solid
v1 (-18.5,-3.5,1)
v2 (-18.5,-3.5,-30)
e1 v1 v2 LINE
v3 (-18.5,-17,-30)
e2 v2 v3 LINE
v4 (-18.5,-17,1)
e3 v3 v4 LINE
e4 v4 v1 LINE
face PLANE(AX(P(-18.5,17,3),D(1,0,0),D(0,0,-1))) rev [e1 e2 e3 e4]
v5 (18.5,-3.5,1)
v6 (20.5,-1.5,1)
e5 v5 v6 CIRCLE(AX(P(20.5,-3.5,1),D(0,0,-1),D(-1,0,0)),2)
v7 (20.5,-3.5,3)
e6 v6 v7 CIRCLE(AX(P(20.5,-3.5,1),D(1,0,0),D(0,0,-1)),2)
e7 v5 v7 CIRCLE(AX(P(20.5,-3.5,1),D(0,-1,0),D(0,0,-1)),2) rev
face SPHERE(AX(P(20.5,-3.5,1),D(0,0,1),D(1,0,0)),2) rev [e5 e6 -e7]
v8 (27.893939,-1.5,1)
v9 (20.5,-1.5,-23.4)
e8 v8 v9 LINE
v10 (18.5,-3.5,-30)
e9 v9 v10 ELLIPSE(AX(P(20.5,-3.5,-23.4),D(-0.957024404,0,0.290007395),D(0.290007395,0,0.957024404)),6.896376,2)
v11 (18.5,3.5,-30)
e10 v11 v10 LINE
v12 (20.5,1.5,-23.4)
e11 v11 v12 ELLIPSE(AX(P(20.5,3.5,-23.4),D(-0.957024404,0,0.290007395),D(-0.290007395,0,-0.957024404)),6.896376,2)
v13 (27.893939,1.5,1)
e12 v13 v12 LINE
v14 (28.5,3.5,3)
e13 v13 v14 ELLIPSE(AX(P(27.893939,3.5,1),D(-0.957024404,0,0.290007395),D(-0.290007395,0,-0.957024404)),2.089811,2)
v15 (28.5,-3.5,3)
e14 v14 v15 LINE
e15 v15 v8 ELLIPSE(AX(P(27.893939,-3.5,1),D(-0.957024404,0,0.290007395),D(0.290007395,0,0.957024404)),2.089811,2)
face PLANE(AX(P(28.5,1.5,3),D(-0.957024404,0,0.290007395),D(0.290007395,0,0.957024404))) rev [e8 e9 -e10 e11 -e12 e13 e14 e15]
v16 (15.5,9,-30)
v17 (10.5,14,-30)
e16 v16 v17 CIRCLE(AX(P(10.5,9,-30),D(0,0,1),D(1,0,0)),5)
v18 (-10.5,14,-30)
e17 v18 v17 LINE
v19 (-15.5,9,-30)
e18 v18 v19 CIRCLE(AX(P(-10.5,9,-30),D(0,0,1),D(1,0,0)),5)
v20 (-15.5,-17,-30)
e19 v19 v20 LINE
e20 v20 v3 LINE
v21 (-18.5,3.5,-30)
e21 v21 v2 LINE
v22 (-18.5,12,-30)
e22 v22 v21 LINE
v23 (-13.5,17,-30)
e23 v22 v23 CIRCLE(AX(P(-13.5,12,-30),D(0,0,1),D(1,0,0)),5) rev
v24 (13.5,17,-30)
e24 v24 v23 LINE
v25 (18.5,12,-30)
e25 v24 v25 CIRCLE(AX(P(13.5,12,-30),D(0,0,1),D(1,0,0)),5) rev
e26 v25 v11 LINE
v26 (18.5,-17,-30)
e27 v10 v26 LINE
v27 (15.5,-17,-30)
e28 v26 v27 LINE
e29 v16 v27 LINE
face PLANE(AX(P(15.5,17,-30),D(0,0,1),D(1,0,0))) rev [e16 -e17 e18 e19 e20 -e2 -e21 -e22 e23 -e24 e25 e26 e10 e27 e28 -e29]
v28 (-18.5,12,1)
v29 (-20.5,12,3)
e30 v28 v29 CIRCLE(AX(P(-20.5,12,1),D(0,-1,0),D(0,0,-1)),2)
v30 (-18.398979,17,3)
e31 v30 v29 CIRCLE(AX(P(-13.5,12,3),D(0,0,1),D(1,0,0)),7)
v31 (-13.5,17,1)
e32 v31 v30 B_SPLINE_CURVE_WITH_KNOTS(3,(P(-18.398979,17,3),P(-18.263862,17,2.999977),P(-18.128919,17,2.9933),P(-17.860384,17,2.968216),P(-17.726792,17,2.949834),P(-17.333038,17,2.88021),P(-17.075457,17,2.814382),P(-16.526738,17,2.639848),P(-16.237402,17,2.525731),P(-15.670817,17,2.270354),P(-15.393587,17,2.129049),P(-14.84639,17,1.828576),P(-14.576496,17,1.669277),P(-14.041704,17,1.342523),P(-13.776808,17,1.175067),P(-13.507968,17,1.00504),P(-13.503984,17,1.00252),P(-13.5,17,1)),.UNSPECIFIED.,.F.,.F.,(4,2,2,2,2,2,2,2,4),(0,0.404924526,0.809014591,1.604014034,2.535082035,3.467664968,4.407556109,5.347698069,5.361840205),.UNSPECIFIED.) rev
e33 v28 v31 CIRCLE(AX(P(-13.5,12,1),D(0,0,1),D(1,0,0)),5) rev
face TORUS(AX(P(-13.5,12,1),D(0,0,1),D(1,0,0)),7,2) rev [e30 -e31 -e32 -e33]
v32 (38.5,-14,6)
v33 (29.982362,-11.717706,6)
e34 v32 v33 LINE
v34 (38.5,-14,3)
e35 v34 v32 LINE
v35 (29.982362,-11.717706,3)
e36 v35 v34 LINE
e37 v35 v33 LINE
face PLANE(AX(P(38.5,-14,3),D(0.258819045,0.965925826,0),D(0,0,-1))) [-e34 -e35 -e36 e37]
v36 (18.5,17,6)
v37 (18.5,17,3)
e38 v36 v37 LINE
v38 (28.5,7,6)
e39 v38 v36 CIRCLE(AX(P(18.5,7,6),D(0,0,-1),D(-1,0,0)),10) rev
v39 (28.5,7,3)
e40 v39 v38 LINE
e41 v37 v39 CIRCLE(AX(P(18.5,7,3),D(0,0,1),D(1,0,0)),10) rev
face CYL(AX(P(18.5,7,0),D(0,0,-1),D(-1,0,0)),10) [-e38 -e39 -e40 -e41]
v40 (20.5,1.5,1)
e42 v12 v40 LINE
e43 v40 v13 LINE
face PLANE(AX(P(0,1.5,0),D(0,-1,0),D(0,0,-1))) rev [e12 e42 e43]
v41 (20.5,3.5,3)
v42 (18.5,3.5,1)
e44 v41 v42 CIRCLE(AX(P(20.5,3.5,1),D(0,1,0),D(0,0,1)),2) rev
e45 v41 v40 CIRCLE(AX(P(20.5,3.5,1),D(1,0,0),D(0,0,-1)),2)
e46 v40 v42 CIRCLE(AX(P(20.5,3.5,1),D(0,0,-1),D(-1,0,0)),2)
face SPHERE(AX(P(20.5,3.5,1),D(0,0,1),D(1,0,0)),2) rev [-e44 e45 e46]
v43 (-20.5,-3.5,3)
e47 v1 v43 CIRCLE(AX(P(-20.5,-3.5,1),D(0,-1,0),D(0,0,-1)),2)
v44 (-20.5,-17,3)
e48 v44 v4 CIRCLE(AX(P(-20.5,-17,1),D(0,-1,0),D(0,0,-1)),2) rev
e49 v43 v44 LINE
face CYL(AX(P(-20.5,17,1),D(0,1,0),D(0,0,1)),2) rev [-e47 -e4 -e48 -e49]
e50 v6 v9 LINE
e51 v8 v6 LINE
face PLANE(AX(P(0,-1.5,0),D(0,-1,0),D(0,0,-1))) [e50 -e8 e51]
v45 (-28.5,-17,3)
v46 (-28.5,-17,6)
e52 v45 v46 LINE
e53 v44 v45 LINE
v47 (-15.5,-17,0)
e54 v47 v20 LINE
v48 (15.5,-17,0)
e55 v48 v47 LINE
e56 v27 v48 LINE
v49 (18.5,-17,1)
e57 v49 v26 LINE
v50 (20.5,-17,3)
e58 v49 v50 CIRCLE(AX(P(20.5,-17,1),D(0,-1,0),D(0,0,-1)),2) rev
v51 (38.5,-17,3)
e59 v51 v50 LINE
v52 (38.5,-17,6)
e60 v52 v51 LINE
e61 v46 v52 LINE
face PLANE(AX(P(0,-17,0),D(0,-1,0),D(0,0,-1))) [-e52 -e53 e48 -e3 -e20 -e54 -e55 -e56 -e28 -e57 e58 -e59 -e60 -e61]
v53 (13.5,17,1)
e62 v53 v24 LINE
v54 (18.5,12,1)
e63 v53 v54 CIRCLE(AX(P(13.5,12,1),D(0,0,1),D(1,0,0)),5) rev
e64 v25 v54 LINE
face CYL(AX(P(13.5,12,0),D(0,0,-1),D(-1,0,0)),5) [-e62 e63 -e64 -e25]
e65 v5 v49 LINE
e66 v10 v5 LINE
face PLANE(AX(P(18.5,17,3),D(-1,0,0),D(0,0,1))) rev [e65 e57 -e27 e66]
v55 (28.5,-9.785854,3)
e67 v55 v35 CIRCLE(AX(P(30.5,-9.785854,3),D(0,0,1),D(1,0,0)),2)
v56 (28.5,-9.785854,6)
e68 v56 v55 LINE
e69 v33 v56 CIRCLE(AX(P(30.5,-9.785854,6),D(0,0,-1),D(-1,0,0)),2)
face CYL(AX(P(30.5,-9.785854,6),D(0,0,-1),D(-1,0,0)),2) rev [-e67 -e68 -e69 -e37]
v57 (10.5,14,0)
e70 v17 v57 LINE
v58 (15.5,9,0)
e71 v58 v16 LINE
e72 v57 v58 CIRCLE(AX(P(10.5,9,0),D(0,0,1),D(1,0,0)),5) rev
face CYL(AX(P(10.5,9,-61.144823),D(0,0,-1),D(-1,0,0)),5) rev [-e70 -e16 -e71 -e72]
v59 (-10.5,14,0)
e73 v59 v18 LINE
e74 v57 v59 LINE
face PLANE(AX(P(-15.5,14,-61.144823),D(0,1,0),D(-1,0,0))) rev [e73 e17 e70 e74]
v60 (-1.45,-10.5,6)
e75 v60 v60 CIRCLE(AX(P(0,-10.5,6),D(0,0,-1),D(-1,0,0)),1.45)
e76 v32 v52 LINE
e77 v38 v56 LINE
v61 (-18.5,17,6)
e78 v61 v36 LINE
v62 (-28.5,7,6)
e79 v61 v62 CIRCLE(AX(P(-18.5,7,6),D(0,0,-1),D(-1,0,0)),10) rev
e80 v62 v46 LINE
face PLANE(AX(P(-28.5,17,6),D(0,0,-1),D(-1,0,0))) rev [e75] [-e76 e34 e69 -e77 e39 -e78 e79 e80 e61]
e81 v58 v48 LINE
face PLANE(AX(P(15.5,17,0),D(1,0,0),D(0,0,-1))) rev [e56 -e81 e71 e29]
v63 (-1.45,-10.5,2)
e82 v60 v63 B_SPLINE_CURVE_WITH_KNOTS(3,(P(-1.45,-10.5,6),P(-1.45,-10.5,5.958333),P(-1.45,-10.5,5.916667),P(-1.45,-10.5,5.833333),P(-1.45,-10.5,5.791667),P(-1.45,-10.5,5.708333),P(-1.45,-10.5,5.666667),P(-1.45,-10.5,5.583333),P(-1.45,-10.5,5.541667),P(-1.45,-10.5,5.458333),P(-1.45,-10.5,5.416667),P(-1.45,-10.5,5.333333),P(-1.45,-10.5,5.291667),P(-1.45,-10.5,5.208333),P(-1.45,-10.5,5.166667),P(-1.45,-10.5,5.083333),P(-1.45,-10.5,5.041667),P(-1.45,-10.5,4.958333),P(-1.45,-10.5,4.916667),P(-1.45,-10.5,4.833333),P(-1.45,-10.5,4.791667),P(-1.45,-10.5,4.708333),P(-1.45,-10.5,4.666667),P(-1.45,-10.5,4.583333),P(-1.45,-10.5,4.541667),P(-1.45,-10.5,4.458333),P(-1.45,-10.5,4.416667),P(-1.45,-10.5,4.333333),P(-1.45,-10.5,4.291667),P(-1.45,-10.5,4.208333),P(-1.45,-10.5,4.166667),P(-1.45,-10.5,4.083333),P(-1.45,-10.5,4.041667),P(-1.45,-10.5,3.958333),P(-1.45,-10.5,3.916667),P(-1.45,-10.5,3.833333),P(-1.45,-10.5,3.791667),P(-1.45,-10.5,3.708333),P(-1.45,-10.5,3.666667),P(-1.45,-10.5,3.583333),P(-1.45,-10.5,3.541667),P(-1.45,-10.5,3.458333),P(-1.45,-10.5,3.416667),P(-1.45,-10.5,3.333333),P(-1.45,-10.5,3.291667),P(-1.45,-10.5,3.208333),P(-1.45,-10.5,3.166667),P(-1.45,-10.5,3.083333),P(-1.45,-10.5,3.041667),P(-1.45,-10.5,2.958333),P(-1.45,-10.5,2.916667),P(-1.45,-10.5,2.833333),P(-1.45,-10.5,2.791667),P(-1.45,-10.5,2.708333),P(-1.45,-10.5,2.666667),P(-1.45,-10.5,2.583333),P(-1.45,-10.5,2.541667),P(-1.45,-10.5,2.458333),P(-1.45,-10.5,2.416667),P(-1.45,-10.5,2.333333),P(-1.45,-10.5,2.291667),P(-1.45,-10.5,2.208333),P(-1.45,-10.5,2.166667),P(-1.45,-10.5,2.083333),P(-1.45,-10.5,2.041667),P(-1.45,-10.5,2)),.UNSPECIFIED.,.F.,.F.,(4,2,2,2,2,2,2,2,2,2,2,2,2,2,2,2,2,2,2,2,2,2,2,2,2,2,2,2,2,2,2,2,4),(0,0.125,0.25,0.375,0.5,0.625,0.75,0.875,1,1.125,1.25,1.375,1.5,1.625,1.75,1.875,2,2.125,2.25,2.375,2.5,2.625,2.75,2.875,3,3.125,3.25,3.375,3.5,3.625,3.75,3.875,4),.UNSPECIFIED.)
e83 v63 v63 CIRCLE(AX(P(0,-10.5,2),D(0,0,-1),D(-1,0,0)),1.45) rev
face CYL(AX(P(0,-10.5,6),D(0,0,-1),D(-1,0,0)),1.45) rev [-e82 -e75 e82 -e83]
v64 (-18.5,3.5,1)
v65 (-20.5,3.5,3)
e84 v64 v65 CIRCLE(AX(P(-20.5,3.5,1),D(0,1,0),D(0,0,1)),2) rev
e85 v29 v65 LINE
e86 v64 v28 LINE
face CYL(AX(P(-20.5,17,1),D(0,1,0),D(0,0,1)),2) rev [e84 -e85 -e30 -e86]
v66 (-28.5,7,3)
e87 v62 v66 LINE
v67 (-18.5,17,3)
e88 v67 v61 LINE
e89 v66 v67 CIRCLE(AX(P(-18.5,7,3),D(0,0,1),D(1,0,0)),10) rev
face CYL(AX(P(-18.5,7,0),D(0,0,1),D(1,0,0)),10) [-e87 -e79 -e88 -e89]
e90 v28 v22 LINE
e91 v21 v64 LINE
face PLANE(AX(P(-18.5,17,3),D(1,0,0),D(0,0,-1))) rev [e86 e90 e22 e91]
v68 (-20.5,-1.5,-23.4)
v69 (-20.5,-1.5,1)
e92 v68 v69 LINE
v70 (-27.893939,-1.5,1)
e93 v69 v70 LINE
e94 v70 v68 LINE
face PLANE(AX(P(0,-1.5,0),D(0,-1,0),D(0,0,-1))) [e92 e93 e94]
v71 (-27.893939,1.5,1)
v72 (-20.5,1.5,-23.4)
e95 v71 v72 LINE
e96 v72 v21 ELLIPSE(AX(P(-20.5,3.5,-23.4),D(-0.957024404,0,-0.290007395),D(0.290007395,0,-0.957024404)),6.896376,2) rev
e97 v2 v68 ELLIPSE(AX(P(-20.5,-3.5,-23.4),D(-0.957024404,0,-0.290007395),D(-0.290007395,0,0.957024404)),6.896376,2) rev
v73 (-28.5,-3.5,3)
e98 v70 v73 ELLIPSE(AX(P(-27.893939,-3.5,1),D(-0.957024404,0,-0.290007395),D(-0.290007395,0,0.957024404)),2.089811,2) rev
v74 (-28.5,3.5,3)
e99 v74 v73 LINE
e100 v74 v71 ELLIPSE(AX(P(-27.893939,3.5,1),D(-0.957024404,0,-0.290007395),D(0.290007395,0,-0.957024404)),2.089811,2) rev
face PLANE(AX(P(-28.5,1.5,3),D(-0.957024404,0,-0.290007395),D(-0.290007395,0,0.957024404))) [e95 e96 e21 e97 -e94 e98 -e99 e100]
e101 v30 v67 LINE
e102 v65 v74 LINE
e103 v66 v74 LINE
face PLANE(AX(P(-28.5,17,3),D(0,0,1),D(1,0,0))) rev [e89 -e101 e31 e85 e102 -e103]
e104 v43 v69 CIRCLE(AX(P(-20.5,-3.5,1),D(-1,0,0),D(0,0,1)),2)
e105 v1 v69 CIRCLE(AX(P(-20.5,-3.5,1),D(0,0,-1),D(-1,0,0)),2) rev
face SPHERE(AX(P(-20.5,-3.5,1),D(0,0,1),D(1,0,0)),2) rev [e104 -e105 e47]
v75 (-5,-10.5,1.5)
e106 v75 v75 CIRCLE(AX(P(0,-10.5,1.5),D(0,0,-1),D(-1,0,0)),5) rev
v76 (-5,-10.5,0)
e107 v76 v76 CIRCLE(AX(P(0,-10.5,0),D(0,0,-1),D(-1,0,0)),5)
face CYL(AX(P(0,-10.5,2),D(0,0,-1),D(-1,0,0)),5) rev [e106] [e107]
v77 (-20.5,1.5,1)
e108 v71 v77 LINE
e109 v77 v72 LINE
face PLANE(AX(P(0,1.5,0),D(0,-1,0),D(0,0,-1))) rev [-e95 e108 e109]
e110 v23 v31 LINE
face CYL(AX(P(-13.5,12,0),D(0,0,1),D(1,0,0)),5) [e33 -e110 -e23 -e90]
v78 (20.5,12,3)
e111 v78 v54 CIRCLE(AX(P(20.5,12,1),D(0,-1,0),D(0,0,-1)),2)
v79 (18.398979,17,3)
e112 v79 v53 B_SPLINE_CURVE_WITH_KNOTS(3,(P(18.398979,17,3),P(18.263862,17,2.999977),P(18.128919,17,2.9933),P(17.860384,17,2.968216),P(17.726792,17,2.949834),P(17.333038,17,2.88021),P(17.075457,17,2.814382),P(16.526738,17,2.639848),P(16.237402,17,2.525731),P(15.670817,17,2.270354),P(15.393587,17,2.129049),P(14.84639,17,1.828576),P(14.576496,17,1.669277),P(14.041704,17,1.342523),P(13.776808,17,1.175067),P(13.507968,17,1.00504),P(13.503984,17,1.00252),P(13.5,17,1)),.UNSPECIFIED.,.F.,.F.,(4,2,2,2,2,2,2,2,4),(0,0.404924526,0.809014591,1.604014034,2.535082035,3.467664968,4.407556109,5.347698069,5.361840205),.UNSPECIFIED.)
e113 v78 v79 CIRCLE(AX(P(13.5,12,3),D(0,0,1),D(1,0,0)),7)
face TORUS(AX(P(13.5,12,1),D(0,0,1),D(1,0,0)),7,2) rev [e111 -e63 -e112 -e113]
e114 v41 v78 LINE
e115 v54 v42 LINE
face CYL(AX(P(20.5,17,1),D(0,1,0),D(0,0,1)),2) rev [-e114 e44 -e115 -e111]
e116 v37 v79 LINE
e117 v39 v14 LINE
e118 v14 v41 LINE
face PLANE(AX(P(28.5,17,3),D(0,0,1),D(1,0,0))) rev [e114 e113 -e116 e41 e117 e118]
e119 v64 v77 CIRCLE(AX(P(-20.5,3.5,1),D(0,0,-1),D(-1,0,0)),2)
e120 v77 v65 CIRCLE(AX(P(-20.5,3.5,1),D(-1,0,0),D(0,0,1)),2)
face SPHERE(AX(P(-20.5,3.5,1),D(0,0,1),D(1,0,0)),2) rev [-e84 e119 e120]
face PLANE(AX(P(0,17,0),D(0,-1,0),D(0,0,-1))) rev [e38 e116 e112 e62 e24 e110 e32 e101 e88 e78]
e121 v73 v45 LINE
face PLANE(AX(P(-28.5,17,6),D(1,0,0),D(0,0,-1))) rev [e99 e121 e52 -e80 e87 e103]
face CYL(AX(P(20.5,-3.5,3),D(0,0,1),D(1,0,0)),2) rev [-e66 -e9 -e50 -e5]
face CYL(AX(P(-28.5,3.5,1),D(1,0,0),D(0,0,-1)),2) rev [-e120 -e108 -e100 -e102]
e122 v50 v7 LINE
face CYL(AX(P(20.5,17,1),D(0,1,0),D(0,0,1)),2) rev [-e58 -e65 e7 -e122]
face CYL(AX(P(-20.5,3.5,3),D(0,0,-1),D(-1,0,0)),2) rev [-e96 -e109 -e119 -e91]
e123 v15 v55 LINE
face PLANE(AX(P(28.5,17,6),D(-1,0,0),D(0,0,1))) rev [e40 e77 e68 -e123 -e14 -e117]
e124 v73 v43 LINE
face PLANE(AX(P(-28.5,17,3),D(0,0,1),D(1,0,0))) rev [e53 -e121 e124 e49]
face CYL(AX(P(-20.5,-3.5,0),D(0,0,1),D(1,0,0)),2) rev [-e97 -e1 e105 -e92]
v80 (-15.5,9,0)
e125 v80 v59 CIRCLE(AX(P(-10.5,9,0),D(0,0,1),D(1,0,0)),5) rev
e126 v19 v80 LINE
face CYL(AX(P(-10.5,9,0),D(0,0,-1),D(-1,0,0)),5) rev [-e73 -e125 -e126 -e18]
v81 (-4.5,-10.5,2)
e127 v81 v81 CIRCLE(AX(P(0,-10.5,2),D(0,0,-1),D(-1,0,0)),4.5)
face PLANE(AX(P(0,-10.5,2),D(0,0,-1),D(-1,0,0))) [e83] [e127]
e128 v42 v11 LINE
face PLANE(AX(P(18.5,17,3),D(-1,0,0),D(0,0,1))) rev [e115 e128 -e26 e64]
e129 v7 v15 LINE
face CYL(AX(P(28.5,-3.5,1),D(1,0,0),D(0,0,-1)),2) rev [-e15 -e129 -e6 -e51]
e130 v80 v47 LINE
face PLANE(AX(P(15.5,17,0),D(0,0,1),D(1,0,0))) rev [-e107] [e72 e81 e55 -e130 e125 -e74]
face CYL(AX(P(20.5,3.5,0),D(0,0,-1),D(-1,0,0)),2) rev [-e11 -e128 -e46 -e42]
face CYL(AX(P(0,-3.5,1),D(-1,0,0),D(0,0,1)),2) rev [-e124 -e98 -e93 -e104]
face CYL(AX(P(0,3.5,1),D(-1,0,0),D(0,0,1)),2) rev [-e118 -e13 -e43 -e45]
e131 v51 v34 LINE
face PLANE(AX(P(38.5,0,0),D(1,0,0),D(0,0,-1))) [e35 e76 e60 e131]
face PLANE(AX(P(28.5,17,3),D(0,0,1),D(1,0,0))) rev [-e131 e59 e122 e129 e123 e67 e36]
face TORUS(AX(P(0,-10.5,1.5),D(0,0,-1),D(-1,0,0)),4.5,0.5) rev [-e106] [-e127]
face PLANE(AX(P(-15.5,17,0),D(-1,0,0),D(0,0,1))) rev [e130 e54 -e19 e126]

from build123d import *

# Parameters (mm, degrees)
BOSS_EXTRUDE1_DEPTH = 17
BOSS_EXTRUDE2_DEPTH = 1.5
SKETCH3_R           = 1.45
CUT_EXTRUDE1_DEPTH  = 45.735332792
FILLET1_R           = 10
SKETCH4_R           = 5
CUT_EXTRUDE4_DEPTH  = 2
FILLET2_R           = 0.5
SKETCH5_W           = 31
SKETCH5_H           = 3
BOSS_EXTRUDE3_DEPTH = 30
SKETCH6_W           = 3
SKETCH6_H           = 3
BOSS_EXTRUDE4_DEPTH = 10
CHAMFER1_SIZE2      = 10
CHAMFER1_SIZE       = 2.679491924
FILLET3_R           = 5
FILLET4_R           = 2


# Some blends are built 0.0001 mm under size
with BuildPart() as part:
    # Sketch1 → Boss-Extrude1 (new, symmetric)
    with BuildSketch(Plane(origin=(0, 0, 0), x_dir=(1, 0, 0), z_dir=(0, 1, 0))):
        Polygon((15.5, 0), (-15.5, 0), (-15.5, 30), (-18.5, 30), (-18.5, -3), (-28.5, -3), (-28.5, -6), (28.5, -6), (28.5, -3), (18.5, -3), (18.5, 30), (15.5, 30), align=None)
    extrude(amount=BOSS_EXTRUDE1_DEPTH, both=True)

    # Sketch2 → Boss-Extrude2 (add, symmetric)
    with BuildSketch(Plane(origin=(0, 0, 0), x_dir=(1, 0, 0), z_dir=(0, 1, 0))):
        Polygon((18.5, 30), (18.5, -3), (28.5, -3), align=None)
    boss_extrude2 = extrude(amount=BOSS_EXTRUDE2_DEPTH, both=True)

    # Mirror1: Boss-Extrude2 across plane
    add(boss_extrude2.mirror(Plane(origin=(0, 0, 0), x_dir=(0, 0, 1), z_dir=(1, 0, 0))))

    # Sketch3 → Cut-Extrude1 (cut, through all)
    with BuildSketch(Plane(origin=(0, 0, 0), x_dir=(-1, 0, 0), z_dir=(0, 0, -1))):
        with Locations((0, -10.5)):
            Circle(SKETCH3_R)
    extrude(amount=-CUT_EXTRUDE1_DEPTH, mode=Mode.SUBTRACT)

    # Fillet1
    fillet1_edges = [part.edges().sort_by_distance(p)[0] for p in [
        (28.5, 17, 4.5),
        (-28.5, 17, 4.5),
    ]]
    fillet(fillet1_edges, radius=FILLET1_R)

    # Sketch4 → Cut-Extrude4 (cut)
    with BuildSketch(Plane(origin=(0, 0, 0), x_dir=(-1, 0, 0), z_dir=(0, 0, -1))):
        with Locations((0, -10.5)):
            Circle(SKETCH4_R)
    extrude(amount=-CUT_EXTRUDE4_DEPTH, mode=Mode.SUBTRACT)

    # Fillet2
    fillet2_edges = [part.edges().sort_by_distance(p)[0] for p in [
        (5, -10.5, 2),
    ]]
    fillet(fillet2_edges, radius=FILLET2_R)

    # Sketch5 → Boss-Extrude3 (add)
    with BuildSketch(Plane(origin=(0, 0, 0), x_dir=(-1, 0, 0), z_dir=(0, 0, -1))):
        with Locations((0, 15.5)):
            Rectangle(SKETCH5_W, SKETCH5_H)
    extrude(amount=BOSS_EXTRUDE3_DEPTH)

    # Sketch6 → Boss-Extrude4 (add)
    with BuildSketch(Plane(origin=(28.5, 0, 0), x_dir=(0, 0, -1), z_dir=(1, 0, 0))):
        with Locations((-4.5, -15.5)):
            Rectangle(SKETCH6_W, SKETCH6_H)
    extrude(amount=BOSS_EXTRUDE4_DEPTH)

    # Chamfer1
    chamfer1_edges = [part.edges().sort_by_distance(p)[0] for p in [
        (28.5, -14, 4.5),
    ]]
    chamfer1_side = [part.faces().sort_by_distance(p)[0] for p in [
        (28.5, -13.946410162, 4.5),
    ]]
    chamfer(chamfer1_edges, length=CHAMFER1_SIZE - 0.0001, length2=CHAMFER1_SIZE2 - 0.0001, reference=chamfer1_side[0])  # a hair under: the kernel refuses the full size

    # Fillet3
    fillet3_edges = [part.edges().sort_by_distance(p)[0] for p in [
        (18.5, 17, -13.5),
        (15.5, 14, -15),
        (-18.5, 17, -13.5),
        (-15.5, 14, -15),
    ]]
    fillet(fillet3_edges, radius=FILLET3_R)

    # Fillet4
    # the kernel refuses this fillet: 2 mm, written as the material it adds along each edge
    with BuildSketch(Plane(origin=(-20.5, 3.5, 1), x_dir=(0, 0, 1), z_dir=(1, 0, 0))) as fillet4_piece_1_section:
        Polygon((0, 0), (FILLET4_R * 1.02, 0), (FILLET4_R * 1.02, FILLET4_R * 1.02), (0, FILLET4_R * 1.02), align=None)
    fillet4_piece_1 = extrude(amount=FILLET4_R * 1.02, mode=Mode.PRIVATE)
    fillet4_piece_1 = fillet4_piece_1 - Plane(origin=(-20.5, 3.5, 1), x_dir=(0, 0.7071067811865475, -0.7071067811865475), z_dir=(1, 0, 0)) * Sphere(FILLET4_R, mode=Mode.PRIVATE)
    add(fillet4_piece_1)
    with BuildSketch(Plane(origin=(20.5, 3.5, 1), x_dir=(-1, 0, 0), z_dir=(0, 0, 1))) as fillet4_piece_2_section:
        Polygon((0, 0), (FILLET4_R * 1.02, 0), (FILLET4_R * 1.02, FILLET4_R * 1.02), (0, FILLET4_R * 1.02), align=None)
    fillet4_piece_2 = extrude(amount=FILLET4_R * 1.02, mode=Mode.PRIVATE)
    fillet4_piece_2 = fillet4_piece_2 - Plane(origin=(20.5, 3.5, 1), x_dir=(0.7071067811865475, 0.7071067811865475, 0), z_dir=(0, 0, 1)) * Sphere(FILLET4_R, mode=Mode.PRIVATE)
    add(fillet4_piece_2)
    with BuildSketch(Plane(origin=(20.5, -3.5, 1), x_dir=(-1, 0, 0), z_dir=(0, 1, 0))) as fillet4_piece_3_section:
        Polygon((0, 0), (FILLET4_R * 1.02, 0), (FILLET4_R * 1.02, FILLET4_R * 1.02), (0, FILLET4_R * 1.02), align=None)
    fillet4_piece_3 = extrude(amount=FILLET4_R * 1.02, mode=Mode.PRIVATE)
    fillet4_piece_3 = fillet4_piece_3 - Plane(origin=(20.5, -3.5, 1), x_dir=(0.7071067811865474, 0, -0.7071067811865477), z_dir=(0, 1, 0)) * Sphere(FILLET4_R, mode=Mode.PRIVATE)
    add(fillet4_piece_3)
    with BuildSketch(Plane(origin=(-20.5, -3.5, 1), x_dir=(0, 1, 0), z_dir=(0, 0, 1))) as fillet4_piece_4_section:
        Polygon((0, 0), (FILLET4_R * 1.02, 0), (FILLET4_R * 1.02, -FILLET4_R * 1.02), (0, -FILLET4_R * 1.02), align=None)
    fillet4_piece_4 = extrude(amount=FILLET4_R * 1.02, mode=Mode.PRIVATE)
    fillet4_piece_4 = fillet4_piece_4 - Plane(origin=(-20.5, -3.5, 1), x_dir=(-0.7071067811865475, -0.7071067811865475, 0), z_dir=(0, 0, 1)) * Sphere(FILLET4_R, mode=Mode.PRIVATE)
    add(fillet4_piece_4)
    with BuildSketch(Plane(origin=(28.5, -11.320608076, 3), x_dir=(0, 1, 0), z_dir=(0, 0, 1))) as fillet4_piece_5:
        with BuildLine():
            CenterArc((FILLET4_R * 0.767332413902, -FILLET4_R), FILLET4_R, 90, 75.000391344)
            Line((-FILLET4_R * 0.19859518016, -FILLET4_R * 0.741187552406), (0, 0))
            Line((0, 0), (FILLET4_R * 0.767332413902, 0))
        make_face()
    extrude(amount=3)
    with BuildSketch(Plane(origin=(-18.5, 3.5, 3), x_dir=(-1, 0, 0), z_dir=(0, 1, 0))) as fillet4_piece_6:
        with BuildLine():
            CenterArc((FILLET4_R, -FILLET4_R), FILLET4_R, 90, 90)
            Line((0, -FILLET4_R), (0, 0))
            Line((0, 0), (FILLET4_R, 0))
        make_face()
    extrude(amount=8.5)
    with BuildSketch(Plane(origin=(18.5, 3.5, 3), x_dir=(1, 0, 0), z_dir=(0, 1, 0))) as fillet4_piece_7:
        with BuildLine():
            CenterArc((FILLET4_R, FILLET4_R), FILLET4_R, 180, 90)
            Line((0, FILLET4_R), (0, 0))
            Line((0, 0), (FILLET4_R, 0))
        make_face()
    extrude(amount=8.5)
    with BuildSketch(Plane(origin=(-13.5, 12, 3), x_dir=(0.8416879607506226, 0.5399642365263262, 0), z_dir=(0.5399642365263262, -0.8416879607506226, 0))) as fillet4_piece_8_section:
        with BuildLine():
            CenterArc((5 + FILLET4_R, -FILLET4_R), FILLET4_R, 90, 90)
            Line((5 + FILLET4_R, 0), (5, 0))
            Line((5, 0), (5, -FILLET4_R))
        make_face()
    fillet4_piece_8 = revolve(axis=Axis((-13.5, 12, 3), (0, 0, 1)), revolution_arc=147.318795695, mode=Mode.PRIVATE)
    fillet4_piece_8 = split(fillet4_piece_8, bisect_by=Plane(origin=(-17.113068515, 17, 2.473069622), z_dir=(0, -1, 0)), keep=Keep.TOP, mode=Mode.PRIVATE)
    add(fillet4_piece_8)
    with BuildSketch(Plane(origin=(13.5, 12, 3), x_dir=(-0.8416879607506225, 0.5399642365263265, 0), z_dir=(-0.5399642365263265, -0.8416879607506225, 0))) as fillet4_piece_9_section:
        with BuildLine():
            CenterArc((5 + FILLET4_R, FILLET4_R), FILLET4_R, 180, 90)
            Line((5, FILLET4_R), (5, 0))
            Line((5, 0), (5 + FILLET4_R, 0))
        make_face()
    fillet4_piece_9 = revolve(axis=Axis((13.5, 12, 3), (0, 0, -1)), revolution_arc=147.318795695, mode=Mode.PRIVATE)
    fillet4_piece_9 = split(fillet4_piece_9, bisect_by=Plane(origin=(17.113068943, 17, 2.473070036), z_dir=(0, -1, 0)), keep=Keep.TOP, mode=Mode.PRIVATE)
    add(fillet4_piece_9)
    with BuildSketch(Plane(origin=(18.5, -17, 3), x_dir=(1, 0, 0), z_dir=(0, 1, 0)), Plane(origin=(-18.5, -17, 3), x_dir=(0, 0, -1), z_dir=(0, 1, 0))) as fillet4_piece_10:
        with BuildLine():
            CenterArc((FILLET4_R, FILLET4_R), FILLET4_R, 180, 90)
            Line((0, FILLET4_R), (0, 0))
            Line((0, 0), (FILLET4_R, 0))
        make_face()
    extrude(amount=13.5)
    with BuildSketch(Plane(origin=(18.5, -1.5, -35), x_dir=(0, -1, 0), z_dir=(0, 0, 1))) as fillet4_piece_11_section:
        with BuildLine():
            CenterArc((FILLET4_R, FILLET4_R), FILLET4_R, 180, 90)
            Line((0, FILLET4_R), (0, 0))
            Line((0, 0), (FILLET4_R, 0))
        make_face()
    fillet4_piece_11 = extrude(amount=36, mode=Mode.PRIVATE)
    fillet4_piece_11 = split(fillet4_piece_11, bisect_by=Plane(origin=(23.03556841, -1.955982706, -15.032624248), z_dir=(-0.9570244044334735, 0, 0.290007395282871)), keep=Keep.TOP, mode=Mode.PRIVATE)
    add(fillet4_piece_11)
    with BuildSketch(Plane(origin=(20.5, -1.5, 3), x_dir=(0, -1, 0), z_dir=(1, 0, 0))) as fillet4_piece_12_section:
        with BuildLine():
            CenterArc((FILLET4_R, FILLET4_R), FILLET4_R, 180, 90)
            Line((0, FILLET4_R), (0, 0))
            Line((0, 0), (FILLET4_R, 0))
        make_face()
    fillet4_piece_12 = extrude(amount=13, mode=Mode.PRIVATE)
    fillet4_piece_12 = split(fillet4_piece_12, bisect_by=Plane(origin=(28.035474122, -1.949923656, 1.467064601), z_dir=(-0.9570244044334735, 0, 0.290007395282871)), keep=Keep.TOP, mode=Mode.PRIVATE)
    add(fillet4_piece_12)
    with BuildSketch(Plane(origin=(18.5, 1.5, -35), x_dir=(0, 1, 0), z_dir=(0, 0, 1))) as fillet4_piece_13_section:
        with BuildLine():
            CenterArc((FILLET4_R, -FILLET4_R), FILLET4_R, 90, 90)
            Line((0, -FILLET4_R), (0, 0))
            Line((0, 0), (FILLET4_R, 0))
        make_face()
    fillet4_piece_13 = extrude(amount=36, mode=Mode.PRIVATE)
    fillet4_piece_13 = split(fillet4_piece_13, bisect_by=Plane(origin=(23.03556841, 1.955982706, -15.032624248), z_dir=(-0.9570244044334735, 0, 0.290007395282871)), keep=Keep.TOP, mode=Mode.PRIVATE)
    add(fillet4_piece_13)
    with BuildSketch(Plane(origin=(20.5, 1.5, 3), x_dir=(0, 1, 0), z_dir=(1, 0, 0))) as fillet4_piece_14_section:
        with BuildLine():
            CenterArc((FILLET4_R, -FILLET4_R), FILLET4_R, 90, 90)
            Line((0, -FILLET4_R), (0, 0))
            Line((0, 0), (FILLET4_R, 0))
        make_face()
    fillet4_piece_14 = extrude(amount=13, mode=Mode.PRIVATE)
    fillet4_piece_14 = split(fillet4_piece_14, bisect_by=Plane(origin=(28.035474122, 1.949923656, 1.467064601), z_dir=(-0.9570244044334735, 0, 0.290007395282871)), keep=Keep.TOP, mode=Mode.PRIVATE)
    add(fillet4_piece_14)
    with BuildSketch(Plane(origin=(-20.5, 1.5, 3), x_dir=(0, 1, 0), z_dir=(-1, 0, 0))) as fillet4_piece_15_section:
        with BuildLine():
            CenterArc((FILLET4_R, FILLET4_R), FILLET4_R, 180, 90)
            Line((0, FILLET4_R), (0, 0))
            Line((0, 0), (FILLET4_R, 0))
        make_face()
    fillet4_piece_15 = extrude(amount=13, mode=Mode.PRIVATE)
    fillet4_piece_15 = split(fillet4_piece_15, bisect_by=Plane(origin=(-28.035474122, 1.949923656, 1.467064601), z_dir=(0.9570244044334735, 0, 0.290007395282871)), keep=Keep.TOP, mode=Mode.PRIVATE)
    add(fillet4_piece_15)
    with BuildSketch(Plane(origin=(-18.5, 1.5, -35), x_dir=(0, 1, 0), z_dir=(0, 0, 1))) as fillet4_piece_16_section:
        with BuildLine():
            CenterArc((FILLET4_R, FILLET4_R), FILLET4_R, 180, 90)
            Line((0, FILLET4_R), (0, 0))
            Line((0, 0), (FILLET4_R, 0))
        make_face()
    fillet4_piece_16 = extrude(amount=36, mode=Mode.PRIVATE)
    fillet4_piece_16 = split(fillet4_piece_16, bisect_by=Plane(origin=(-23.03556841, 1.955982706, -15.032624248), z_dir=(0.9570244044334735, 0, 0.290007395282871)), keep=Keep.TOP, mode=Mode.PRIVATE)
    add(fillet4_piece_16)
    with BuildSketch(Plane(origin=(-18.5, -1.5, -35), x_dir=(0, -1, 0), z_dir=(0, 0, 1))) as fillet4_piece_17_section:
        with BuildLine():
            CenterArc((FILLET4_R, -FILLET4_R), FILLET4_R, 90, 90)
            Line((0, -FILLET4_R), (0, 0))
            Line((0, 0), (FILLET4_R, 0))
        make_face()
    fillet4_piece_17 = extrude(amount=36, mode=Mode.PRIVATE)
    fillet4_piece_17 = split(fillet4_piece_17, bisect_by=Plane(origin=(-23.03556841, -1.955982706, -15.032624248), z_dir=(0.9570244044334735, 0, 0.290007395282871)), keep=Keep.TOP, mode=Mode.PRIVATE)
    add(fillet4_piece_17)
    with BuildSketch(Plane(origin=(-20.5, -1.5, 3), x_dir=(0, -1, 0), z_dir=(-1, 0, 0))) as fillet4_piece_18_section:
        with BuildLine():
            CenterArc((FILLET4_R, -FILLET4_R), FILLET4_R, 90, 90)
            Line((0, -FILLET4_R), (0, 0))
            Line((0, 0), (FILLET4_R, 0))
        make_face()
    fillet4_piece_18 = extrude(amount=13, mode=Mode.PRIVATE)
    fillet4_piece_18 = split(fillet4_piece_18, bisect_by=Plane(origin=(-28.035474122, -1.949923656, 1.467064601), z_dir=(0.9570244044334735, 0, 0.290007395282871)), keep=Keep.TOP, mode=Mode.PRIVATE)
    add(fillet4_piece_18)


solid = part.part
